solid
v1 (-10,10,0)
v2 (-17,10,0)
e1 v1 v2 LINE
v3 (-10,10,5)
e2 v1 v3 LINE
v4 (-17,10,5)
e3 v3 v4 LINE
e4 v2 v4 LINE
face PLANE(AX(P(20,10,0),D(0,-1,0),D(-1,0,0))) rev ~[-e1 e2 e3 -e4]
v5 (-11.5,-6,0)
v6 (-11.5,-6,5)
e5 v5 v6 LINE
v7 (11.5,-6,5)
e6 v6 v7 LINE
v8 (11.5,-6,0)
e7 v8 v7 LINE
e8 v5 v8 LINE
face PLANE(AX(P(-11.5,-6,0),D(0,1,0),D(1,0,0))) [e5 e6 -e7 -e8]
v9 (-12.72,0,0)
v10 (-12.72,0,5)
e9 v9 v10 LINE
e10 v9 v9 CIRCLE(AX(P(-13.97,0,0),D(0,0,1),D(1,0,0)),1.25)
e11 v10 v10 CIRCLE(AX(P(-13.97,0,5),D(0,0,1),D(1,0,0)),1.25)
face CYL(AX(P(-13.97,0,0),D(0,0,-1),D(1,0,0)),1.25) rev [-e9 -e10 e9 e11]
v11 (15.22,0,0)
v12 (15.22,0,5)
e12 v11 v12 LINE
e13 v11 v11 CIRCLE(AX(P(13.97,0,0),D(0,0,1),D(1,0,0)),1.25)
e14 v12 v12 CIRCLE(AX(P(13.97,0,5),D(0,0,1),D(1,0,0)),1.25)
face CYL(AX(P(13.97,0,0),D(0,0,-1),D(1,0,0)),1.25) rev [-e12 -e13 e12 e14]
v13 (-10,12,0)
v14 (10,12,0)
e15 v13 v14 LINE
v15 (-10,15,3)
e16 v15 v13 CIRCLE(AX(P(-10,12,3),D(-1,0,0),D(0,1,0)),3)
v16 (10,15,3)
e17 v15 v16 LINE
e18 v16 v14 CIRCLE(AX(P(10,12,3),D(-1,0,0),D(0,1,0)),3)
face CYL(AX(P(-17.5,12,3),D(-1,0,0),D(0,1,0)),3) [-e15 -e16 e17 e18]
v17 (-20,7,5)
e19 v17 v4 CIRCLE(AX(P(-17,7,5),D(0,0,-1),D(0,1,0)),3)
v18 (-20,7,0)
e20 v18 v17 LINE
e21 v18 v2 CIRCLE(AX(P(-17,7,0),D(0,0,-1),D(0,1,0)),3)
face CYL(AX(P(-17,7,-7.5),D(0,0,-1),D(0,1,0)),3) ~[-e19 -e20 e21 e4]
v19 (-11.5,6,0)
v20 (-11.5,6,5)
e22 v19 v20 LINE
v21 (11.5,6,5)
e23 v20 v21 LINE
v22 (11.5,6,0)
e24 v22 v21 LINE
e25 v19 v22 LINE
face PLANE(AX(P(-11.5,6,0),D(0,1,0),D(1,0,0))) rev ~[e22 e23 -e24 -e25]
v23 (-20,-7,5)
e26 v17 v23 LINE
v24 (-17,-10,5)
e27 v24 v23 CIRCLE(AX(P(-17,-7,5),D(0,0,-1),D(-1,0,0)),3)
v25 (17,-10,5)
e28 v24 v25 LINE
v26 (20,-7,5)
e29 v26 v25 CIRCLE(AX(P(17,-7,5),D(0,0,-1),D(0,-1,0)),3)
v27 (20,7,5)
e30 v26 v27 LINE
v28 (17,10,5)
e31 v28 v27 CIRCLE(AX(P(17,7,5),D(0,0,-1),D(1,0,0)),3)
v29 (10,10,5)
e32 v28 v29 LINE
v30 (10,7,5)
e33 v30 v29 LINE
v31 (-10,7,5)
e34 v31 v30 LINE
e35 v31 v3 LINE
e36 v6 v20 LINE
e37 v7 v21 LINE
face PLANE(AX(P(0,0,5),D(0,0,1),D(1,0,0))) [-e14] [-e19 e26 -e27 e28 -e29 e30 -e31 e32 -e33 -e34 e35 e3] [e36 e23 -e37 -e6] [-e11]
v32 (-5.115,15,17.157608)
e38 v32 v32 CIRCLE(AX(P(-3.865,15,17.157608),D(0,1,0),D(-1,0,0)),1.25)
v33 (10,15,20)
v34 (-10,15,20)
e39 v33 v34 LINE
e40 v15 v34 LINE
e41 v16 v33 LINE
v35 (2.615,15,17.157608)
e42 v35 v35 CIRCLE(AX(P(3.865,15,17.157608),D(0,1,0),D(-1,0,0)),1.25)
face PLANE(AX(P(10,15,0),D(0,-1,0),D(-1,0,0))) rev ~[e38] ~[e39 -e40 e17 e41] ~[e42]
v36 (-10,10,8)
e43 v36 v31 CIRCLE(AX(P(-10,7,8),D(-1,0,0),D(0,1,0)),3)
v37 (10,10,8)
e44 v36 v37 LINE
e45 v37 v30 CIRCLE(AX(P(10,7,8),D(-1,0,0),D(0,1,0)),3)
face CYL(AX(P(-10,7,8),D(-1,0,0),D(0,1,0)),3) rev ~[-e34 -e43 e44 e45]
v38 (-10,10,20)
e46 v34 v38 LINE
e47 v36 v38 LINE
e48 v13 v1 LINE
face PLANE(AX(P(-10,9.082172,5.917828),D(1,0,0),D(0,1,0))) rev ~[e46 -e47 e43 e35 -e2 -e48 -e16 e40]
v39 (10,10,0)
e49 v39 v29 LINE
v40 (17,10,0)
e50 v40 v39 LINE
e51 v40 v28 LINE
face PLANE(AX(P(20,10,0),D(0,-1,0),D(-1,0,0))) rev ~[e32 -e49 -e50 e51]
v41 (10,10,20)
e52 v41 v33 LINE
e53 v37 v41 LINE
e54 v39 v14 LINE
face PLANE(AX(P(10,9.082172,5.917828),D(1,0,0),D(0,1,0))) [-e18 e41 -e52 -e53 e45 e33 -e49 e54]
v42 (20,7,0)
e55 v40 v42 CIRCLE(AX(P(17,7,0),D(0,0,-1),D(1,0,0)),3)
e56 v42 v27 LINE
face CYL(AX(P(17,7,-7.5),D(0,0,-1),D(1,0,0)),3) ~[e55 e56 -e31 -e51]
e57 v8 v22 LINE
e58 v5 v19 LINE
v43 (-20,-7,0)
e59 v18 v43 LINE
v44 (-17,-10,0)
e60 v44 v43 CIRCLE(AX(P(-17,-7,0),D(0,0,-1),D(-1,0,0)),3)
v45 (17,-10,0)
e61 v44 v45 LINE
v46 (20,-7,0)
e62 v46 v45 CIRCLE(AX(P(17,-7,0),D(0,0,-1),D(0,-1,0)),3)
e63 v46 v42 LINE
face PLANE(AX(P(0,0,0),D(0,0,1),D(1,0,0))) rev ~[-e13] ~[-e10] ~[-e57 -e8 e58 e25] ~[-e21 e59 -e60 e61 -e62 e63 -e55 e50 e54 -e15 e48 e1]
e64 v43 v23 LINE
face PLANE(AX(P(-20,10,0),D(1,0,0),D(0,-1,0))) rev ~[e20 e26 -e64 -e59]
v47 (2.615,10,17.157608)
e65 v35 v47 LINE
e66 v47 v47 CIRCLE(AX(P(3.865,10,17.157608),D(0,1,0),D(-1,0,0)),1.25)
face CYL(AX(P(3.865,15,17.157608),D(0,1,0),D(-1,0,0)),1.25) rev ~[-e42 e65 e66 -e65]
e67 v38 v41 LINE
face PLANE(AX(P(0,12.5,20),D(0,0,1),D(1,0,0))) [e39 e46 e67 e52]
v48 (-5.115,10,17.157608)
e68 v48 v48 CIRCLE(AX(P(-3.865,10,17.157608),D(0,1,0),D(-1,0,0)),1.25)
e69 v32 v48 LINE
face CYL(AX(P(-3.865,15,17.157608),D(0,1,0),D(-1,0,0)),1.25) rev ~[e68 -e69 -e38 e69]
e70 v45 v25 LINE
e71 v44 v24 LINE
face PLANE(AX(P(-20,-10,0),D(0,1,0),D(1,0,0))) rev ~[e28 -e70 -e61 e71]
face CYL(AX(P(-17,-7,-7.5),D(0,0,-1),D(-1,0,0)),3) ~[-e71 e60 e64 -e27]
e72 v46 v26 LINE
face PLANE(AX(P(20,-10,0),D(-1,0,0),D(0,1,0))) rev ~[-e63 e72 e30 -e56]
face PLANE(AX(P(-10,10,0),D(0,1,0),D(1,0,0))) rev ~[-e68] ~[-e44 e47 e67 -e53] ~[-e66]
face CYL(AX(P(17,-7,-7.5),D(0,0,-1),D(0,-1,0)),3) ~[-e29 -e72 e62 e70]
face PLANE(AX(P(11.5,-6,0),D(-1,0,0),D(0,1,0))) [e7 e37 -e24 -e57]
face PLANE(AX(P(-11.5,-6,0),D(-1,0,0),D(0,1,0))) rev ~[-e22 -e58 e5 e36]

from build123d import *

# Parameters (mm, degrees)
F1_DEPTH    = 20
F0_R        = 1.25
F0_W        = 23
F0_H        = 12
F2_DEPTH    = 5
F3_R        = 1.25
F4_DEPTH    = 5
F5_T1_DEPTH = 20
F5_T3_DEPTH = 20
F5_T5_DEPTH = 35


# Not quite as in the source:
# - a fillet or chamfer that OpenCascade refuses, or shapes differently, is made with other operations: its cross-section is extruded or revolved along the edge and cut away or added


with BuildPart() as f1:
    # F0 (on Top) → F1 (new body)
    with BuildSketch(Plane.XY):
        Polygon((-10, 15), (-10, 10), (10, 10), (10, 15), (0, 15), align=None)
    extrude(amount=F1_DEPTH)

    # F0 (on Top) → F2 (join)
    with BuildSketch(Plane.XY):
        Polygon((-10, 10), (-20, 10), (-20, -10), (20, -10), (20, 10), (10, 10), align=None)
        with Locations((-13.97, 0)):
            Circle(F0_R, mode=Mode.SUBTRACT)
        Rectangle(F0_W, F0_H, mode=Mode.SUBTRACT)
        with Locations((13.97, 0)):
            Circle(F0_R, mode=Mode.SUBTRACT)
    extrude(amount=F2_DEPTH)

    # F3 (on face) → F4 (cut)
    with BuildSketch(Plane(origin=(0, 15, 0), x_dir=(-1, 0, 0), z_dir=(0, 1, 0))):
        with Locations((3.865, 17.1576076342)):
            Circle(F3_R)
        with Locations((-3.865, 17.1576076342)):
            Circle(F3_R)
    extrude(amount=-F4_DEPTH, mode=Mode.SUBTRACT)

    # F5: fillet of radius 3 on 8 edges, made by hand

    # F5_s2 → F5_t1 (join)
    with BuildSketch(Plane.YZ.offset(-10)):
        with BuildLine():
            ThreePointArc((10, 8), (9.1213203436, 5.8786796564), (7, 5))
            Line((7, 5), (10, 5))
            Line((10, 5), (10, 8))
        make_face()
    extrude(amount=F5_T1_DEPTH)

    # F5_s4 → F5_t3 (cut)
    with BuildSketch(Plane.XY.offset(-7.5)):
        with BuildLine():
            ThreePointArc((-17, 10), (-19.1213203436, 9.1213203436), (-20, 7))
            Line((-20, 7), (-20, 10))
            Line((-20, 10), (-17, 10))
        make_face()
        with BuildLine():
            ThreePointArc((20, 7), (19.1213203436, 9.1213203436), (17, 10))
            Line((17, 10), (20, 10))
            Line((20, 10), (20, 7))
        make_face()
        with BuildLine():
            ThreePointArc((17, -10), (19.1213203436, -9.1213203436), (20, -7))
            Line((20, -7), (20, -10))
            Line((20, -10), (17, -10))
        make_face()
        with BuildLine():
            ThreePointArc((-20, -7), (-19.1213203436, -9.1213203436), (-17, -10))
            Line((-17, -10), (-20, -10))
            Line((-20, -10), (-20, -7))
        make_face()
    extrude(amount=F5_T3_DEPTH, mode=Mode.SUBTRACT)

    # F5_s6 → F5_t5 (cut)
    with BuildSketch(Plane.YZ.offset(-17.5)):
        with BuildLine():
            ThreePointArc((15, 3), (14.1213203436, 0.8786796564), (12, 0))
            Line((12, 0), (15, 0))
            Line((15, 0), (15, 3))
        make_face()
    extrude(amount=F5_T5_DEPTH, mode=Mode.SUBTRACT)


solid = f1.part
